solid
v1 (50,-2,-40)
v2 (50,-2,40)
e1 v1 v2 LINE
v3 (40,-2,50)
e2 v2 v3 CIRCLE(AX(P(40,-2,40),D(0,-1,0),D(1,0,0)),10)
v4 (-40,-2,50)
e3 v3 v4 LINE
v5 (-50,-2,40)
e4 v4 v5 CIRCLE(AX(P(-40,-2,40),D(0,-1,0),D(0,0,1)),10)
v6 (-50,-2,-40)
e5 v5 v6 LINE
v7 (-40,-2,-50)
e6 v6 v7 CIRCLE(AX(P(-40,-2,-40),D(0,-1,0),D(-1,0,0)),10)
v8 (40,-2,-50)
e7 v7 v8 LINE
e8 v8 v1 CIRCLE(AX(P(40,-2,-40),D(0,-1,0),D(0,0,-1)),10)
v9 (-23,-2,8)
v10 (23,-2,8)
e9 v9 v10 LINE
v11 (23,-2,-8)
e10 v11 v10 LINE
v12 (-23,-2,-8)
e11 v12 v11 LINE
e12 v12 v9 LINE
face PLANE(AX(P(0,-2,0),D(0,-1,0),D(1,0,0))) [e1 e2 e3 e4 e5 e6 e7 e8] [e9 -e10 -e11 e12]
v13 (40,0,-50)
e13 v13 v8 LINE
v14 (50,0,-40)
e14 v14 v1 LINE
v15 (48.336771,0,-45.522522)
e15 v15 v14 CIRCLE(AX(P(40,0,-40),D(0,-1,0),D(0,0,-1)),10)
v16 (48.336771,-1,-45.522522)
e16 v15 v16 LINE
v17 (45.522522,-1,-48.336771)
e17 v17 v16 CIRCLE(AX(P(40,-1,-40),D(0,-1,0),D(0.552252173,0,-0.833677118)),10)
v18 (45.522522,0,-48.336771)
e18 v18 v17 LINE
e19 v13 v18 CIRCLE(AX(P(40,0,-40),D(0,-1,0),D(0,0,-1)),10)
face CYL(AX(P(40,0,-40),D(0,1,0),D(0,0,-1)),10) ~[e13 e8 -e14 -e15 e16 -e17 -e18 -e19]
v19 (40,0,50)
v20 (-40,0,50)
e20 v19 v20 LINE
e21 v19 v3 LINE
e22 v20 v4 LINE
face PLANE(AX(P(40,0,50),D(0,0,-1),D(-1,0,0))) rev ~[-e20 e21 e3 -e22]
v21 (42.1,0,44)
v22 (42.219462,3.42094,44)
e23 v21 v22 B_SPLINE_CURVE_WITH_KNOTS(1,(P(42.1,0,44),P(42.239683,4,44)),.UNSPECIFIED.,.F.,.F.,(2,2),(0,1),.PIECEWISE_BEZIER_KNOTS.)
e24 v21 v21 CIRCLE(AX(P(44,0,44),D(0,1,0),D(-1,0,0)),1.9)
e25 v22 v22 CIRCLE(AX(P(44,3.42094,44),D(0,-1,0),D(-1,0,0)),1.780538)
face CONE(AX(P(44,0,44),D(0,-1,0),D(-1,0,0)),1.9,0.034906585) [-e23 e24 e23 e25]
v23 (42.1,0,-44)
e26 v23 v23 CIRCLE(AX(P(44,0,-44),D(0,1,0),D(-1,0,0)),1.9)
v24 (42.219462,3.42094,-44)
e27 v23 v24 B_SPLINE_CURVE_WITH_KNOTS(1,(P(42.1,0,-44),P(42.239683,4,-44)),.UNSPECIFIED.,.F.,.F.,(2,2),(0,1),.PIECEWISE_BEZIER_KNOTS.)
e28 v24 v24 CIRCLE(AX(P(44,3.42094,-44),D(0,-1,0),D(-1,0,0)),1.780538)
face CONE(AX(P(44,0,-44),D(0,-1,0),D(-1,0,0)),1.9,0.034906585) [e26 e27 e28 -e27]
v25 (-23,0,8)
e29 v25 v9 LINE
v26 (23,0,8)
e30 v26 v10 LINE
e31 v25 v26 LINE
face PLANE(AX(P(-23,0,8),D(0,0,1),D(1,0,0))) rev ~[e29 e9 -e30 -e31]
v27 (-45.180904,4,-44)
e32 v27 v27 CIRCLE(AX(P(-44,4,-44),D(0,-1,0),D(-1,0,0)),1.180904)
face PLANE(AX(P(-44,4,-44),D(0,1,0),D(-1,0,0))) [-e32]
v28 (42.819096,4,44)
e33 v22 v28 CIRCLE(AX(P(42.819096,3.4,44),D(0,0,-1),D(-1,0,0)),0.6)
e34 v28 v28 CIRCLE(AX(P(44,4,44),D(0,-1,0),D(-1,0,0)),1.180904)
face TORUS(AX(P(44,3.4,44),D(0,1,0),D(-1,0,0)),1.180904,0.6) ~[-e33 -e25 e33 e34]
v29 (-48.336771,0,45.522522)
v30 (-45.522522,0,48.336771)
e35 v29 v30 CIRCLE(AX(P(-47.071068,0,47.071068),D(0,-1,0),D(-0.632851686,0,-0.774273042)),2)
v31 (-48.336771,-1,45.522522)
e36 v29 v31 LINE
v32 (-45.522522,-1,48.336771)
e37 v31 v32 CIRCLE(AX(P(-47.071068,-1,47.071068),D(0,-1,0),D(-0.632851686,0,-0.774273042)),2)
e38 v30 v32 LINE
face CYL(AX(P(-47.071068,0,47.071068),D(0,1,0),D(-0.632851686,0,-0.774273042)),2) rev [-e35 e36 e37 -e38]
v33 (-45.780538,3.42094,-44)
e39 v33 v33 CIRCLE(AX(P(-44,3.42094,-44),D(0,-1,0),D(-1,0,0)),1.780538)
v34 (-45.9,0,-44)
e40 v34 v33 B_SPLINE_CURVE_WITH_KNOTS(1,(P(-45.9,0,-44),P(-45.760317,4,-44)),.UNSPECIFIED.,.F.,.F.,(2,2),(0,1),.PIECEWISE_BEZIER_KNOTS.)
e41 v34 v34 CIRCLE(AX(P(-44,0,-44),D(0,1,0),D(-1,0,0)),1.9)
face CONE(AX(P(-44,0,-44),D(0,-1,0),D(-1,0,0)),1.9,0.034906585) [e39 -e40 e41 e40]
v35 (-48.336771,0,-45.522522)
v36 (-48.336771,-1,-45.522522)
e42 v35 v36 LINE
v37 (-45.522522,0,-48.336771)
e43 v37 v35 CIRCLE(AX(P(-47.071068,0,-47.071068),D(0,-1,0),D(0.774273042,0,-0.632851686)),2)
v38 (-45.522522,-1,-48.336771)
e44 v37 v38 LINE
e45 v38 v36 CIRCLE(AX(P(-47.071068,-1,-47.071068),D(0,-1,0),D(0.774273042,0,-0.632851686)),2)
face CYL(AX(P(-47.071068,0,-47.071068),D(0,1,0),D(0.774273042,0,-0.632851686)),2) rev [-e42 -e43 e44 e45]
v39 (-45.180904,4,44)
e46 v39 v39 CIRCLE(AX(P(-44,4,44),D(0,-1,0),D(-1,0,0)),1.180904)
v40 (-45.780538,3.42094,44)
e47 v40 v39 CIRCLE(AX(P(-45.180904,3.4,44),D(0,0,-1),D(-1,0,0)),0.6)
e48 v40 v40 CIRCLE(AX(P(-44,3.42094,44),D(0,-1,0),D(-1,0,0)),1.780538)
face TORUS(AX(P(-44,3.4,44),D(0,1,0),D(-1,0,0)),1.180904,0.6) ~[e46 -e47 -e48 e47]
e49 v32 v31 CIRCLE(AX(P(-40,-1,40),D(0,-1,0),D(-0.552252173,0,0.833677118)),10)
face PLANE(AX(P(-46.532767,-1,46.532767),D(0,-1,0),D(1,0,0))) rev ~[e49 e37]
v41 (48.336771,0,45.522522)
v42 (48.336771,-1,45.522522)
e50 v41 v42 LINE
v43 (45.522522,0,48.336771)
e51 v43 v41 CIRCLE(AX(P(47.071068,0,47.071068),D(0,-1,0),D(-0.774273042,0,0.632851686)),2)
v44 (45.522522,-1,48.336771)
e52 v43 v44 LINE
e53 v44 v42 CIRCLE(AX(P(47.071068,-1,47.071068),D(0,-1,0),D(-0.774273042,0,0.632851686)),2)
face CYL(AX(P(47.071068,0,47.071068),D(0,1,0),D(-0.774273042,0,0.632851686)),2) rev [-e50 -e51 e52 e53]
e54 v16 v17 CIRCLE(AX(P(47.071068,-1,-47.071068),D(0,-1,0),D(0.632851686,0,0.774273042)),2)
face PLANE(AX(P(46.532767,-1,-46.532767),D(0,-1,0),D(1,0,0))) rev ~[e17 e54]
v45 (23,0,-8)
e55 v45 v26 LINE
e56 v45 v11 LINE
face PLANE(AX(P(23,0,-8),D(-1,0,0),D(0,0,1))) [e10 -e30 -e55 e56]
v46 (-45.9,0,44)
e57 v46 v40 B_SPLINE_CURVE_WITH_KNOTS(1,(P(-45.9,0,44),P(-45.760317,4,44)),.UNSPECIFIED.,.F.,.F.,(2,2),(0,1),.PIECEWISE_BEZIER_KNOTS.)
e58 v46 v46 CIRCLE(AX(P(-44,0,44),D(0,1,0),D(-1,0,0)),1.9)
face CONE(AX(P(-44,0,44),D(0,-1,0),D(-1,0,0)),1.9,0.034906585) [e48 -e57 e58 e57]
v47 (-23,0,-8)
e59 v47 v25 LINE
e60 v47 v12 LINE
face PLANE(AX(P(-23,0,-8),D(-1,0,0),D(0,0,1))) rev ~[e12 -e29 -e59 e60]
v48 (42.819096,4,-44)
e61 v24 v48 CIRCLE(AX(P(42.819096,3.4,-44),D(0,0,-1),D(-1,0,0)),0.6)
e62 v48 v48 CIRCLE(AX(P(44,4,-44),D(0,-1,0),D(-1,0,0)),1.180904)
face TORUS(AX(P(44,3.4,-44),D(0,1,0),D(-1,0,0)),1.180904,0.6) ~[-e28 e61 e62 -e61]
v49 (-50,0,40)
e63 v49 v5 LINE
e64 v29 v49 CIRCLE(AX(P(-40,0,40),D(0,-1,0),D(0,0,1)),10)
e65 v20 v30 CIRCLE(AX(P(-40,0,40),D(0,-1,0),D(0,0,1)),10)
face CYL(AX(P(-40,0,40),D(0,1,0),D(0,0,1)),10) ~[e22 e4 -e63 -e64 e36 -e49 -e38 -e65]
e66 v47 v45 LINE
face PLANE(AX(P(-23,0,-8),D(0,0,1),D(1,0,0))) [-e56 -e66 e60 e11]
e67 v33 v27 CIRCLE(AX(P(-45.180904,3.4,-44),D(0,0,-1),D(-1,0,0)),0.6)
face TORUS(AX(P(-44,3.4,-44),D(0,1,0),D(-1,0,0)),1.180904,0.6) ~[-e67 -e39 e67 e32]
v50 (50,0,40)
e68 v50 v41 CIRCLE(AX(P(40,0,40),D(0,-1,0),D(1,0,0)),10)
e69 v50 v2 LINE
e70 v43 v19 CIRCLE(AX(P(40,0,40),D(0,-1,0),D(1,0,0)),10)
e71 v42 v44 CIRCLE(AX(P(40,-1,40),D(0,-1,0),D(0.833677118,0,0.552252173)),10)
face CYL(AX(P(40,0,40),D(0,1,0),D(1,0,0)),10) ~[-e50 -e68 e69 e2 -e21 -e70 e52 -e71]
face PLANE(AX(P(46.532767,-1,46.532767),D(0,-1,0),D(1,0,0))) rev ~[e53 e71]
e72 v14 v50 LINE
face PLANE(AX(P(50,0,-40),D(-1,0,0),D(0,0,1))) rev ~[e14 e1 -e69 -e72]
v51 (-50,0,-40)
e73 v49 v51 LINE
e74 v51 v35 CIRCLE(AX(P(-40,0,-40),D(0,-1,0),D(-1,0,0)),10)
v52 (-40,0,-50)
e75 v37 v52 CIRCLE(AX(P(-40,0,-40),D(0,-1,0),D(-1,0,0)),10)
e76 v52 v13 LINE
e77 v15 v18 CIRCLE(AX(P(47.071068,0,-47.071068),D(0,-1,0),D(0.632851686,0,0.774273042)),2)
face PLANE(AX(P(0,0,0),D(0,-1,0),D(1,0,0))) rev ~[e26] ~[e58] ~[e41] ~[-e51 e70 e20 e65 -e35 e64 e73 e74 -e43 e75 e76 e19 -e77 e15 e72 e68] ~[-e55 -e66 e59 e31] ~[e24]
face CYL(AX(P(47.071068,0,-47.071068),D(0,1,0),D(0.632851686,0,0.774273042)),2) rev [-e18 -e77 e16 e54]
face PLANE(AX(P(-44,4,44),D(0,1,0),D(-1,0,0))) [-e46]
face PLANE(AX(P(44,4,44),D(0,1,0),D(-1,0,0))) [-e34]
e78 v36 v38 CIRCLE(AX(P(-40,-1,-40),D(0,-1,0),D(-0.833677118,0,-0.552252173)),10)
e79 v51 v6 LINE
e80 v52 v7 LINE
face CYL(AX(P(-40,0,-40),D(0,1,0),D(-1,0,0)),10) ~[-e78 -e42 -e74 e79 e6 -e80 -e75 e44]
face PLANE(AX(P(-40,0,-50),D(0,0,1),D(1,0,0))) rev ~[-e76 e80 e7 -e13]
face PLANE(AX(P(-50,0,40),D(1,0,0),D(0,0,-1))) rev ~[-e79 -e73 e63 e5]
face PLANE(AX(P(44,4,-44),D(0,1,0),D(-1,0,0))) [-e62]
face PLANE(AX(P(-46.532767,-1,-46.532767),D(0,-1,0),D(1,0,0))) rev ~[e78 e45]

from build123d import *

# Parameters (mm, degrees)
F0_W     = 46
F0_H     = 16
F1_DEPTH = 2
F2_R     = 1.9
F3_DEPTH = 4
F3_TAPER = 2
F5_DEPTH = 1
F6_R     = 0.6


# Not quite as in the source:
# - a feature names something its author has since deleted; it is built from what else it names


with BuildPart() as f1:
    # F0 (on Front) → F1 (new body)
    with BuildSketch(Plane.XZ):
        Polygon((-40, -50), (40, -50), (40, -40), (50, -40), (50, 40), (40, 40), (40, 50), (-40, 50), (-40, 40), (-50, 40), (-50, -40), (-40, -40), align=None)
        Rectangle(F0_W, F0_H, mode=Mode.SUBTRACT)
        with BuildLine():
            Line((40, -40), (40, -50))
            ThreePointArc((40, -50), (47.0710678119, -47.0710678119), (50, -40))
            Line((50, -40), (40, -40))
        make_face()
        with BuildLine():
            ThreePointArc((-50, -40), (-47.0710678119, -47.0710678119), (-40, -50))
            Line((-40, -50), (-40, -40))
            Line((-40, -40), (-50, -40))
        make_face()
        with BuildLine():
            Line((40, 40), (50, 40))
            ThreePointArc((50, 40), (47.0710678119, 47.0710678119), (40, 50))
            Line((40, 50), (40, 40))
        make_face()
        with BuildLine():
            ThreePointArc((-40, 50), (-47.0710678119, 47.0710678119), (-50, 40))
            Line((-50, 40), (-40, 40))
            Line((-40, 40), (-40, 50))
        make_face()
    extrude(amount=F1_DEPTH)

    # F2 (on face) → F3 (join)
    with BuildSketch(Plane(origin=(0, 0, 0), x_dir=(-1, 0, 0), z_dir=(0, 1, 0))):
        with Locations((-44, 44)):
            Circle(F2_R)
        with Locations((44, 44)):
            Circle(F2_R)
        with Locations((-44, -44)):
            Circle(F2_R)
        with Locations((44, -44)):
            Circle(F2_R)
    extrude(amount=F3_DEPTH, taper=F3_TAPER)

    # F4 (on face) → F5 (cut)
    with BuildSketch(Plane.XZ):
        with BuildLine():
            ThreePointArc((48.3367711836, 45.5225217277), (47.0710678119, 47.0710678119), (45.5225217277, 48.3367711836))
            ThreePointArc((45.5225217277, 48.3367711836), (45.6568542495, 45.6568542495), (48.3367711836, 45.5225217277))
        make_face()
        with BuildLine():
            ThreePointArc((-48.3367711836, 45.5225217277), (-45.6568542495, 45.6568542495), (-45.5225217277, 48.3367711836))
            ThreePointArc((-45.5225217277, 48.3367711836), (-47.0710678119, 47.0710678119), (-48.3367711836, 45.5225217277))
        make_face()
        with BuildLine():
            ThreePointArc((-48.3367711836, -45.5225217277), (-47.0710678119, -47.0710678119), (-45.5225217277, -48.3367711836))
            ThreePointArc((-45.5225217277, -48.3367711836), (-45.6568542495, -45.6568542495), (-48.3367711836, -45.5225217277))
        make_face()
        with BuildLine():
            ThreePointArc((48.3367711836, -45.5225217277), (45.6568542495, -45.6568542495), (45.5225217277, -48.3367711836))
            ThreePointArc((45.5225217277, -48.3367711836), (47.0710678119, -47.0710678119), (48.3367711836, -45.5225217277))
        make_face()
    extrude(amount=F5_DEPTH, mode=Mode.SUBTRACT)

    # F6
    f6_edges = [f1.edges().sort_by_distance(p)[0] for p in [
        (45.760317, 4, 44),
        (45.760317, 4, -44),
        (-42.239683, 4, 44),
        (-42.239683, 4, -44),
    ]]
    fillet(f6_edges, radius=F6_R)


solid = f1.part
